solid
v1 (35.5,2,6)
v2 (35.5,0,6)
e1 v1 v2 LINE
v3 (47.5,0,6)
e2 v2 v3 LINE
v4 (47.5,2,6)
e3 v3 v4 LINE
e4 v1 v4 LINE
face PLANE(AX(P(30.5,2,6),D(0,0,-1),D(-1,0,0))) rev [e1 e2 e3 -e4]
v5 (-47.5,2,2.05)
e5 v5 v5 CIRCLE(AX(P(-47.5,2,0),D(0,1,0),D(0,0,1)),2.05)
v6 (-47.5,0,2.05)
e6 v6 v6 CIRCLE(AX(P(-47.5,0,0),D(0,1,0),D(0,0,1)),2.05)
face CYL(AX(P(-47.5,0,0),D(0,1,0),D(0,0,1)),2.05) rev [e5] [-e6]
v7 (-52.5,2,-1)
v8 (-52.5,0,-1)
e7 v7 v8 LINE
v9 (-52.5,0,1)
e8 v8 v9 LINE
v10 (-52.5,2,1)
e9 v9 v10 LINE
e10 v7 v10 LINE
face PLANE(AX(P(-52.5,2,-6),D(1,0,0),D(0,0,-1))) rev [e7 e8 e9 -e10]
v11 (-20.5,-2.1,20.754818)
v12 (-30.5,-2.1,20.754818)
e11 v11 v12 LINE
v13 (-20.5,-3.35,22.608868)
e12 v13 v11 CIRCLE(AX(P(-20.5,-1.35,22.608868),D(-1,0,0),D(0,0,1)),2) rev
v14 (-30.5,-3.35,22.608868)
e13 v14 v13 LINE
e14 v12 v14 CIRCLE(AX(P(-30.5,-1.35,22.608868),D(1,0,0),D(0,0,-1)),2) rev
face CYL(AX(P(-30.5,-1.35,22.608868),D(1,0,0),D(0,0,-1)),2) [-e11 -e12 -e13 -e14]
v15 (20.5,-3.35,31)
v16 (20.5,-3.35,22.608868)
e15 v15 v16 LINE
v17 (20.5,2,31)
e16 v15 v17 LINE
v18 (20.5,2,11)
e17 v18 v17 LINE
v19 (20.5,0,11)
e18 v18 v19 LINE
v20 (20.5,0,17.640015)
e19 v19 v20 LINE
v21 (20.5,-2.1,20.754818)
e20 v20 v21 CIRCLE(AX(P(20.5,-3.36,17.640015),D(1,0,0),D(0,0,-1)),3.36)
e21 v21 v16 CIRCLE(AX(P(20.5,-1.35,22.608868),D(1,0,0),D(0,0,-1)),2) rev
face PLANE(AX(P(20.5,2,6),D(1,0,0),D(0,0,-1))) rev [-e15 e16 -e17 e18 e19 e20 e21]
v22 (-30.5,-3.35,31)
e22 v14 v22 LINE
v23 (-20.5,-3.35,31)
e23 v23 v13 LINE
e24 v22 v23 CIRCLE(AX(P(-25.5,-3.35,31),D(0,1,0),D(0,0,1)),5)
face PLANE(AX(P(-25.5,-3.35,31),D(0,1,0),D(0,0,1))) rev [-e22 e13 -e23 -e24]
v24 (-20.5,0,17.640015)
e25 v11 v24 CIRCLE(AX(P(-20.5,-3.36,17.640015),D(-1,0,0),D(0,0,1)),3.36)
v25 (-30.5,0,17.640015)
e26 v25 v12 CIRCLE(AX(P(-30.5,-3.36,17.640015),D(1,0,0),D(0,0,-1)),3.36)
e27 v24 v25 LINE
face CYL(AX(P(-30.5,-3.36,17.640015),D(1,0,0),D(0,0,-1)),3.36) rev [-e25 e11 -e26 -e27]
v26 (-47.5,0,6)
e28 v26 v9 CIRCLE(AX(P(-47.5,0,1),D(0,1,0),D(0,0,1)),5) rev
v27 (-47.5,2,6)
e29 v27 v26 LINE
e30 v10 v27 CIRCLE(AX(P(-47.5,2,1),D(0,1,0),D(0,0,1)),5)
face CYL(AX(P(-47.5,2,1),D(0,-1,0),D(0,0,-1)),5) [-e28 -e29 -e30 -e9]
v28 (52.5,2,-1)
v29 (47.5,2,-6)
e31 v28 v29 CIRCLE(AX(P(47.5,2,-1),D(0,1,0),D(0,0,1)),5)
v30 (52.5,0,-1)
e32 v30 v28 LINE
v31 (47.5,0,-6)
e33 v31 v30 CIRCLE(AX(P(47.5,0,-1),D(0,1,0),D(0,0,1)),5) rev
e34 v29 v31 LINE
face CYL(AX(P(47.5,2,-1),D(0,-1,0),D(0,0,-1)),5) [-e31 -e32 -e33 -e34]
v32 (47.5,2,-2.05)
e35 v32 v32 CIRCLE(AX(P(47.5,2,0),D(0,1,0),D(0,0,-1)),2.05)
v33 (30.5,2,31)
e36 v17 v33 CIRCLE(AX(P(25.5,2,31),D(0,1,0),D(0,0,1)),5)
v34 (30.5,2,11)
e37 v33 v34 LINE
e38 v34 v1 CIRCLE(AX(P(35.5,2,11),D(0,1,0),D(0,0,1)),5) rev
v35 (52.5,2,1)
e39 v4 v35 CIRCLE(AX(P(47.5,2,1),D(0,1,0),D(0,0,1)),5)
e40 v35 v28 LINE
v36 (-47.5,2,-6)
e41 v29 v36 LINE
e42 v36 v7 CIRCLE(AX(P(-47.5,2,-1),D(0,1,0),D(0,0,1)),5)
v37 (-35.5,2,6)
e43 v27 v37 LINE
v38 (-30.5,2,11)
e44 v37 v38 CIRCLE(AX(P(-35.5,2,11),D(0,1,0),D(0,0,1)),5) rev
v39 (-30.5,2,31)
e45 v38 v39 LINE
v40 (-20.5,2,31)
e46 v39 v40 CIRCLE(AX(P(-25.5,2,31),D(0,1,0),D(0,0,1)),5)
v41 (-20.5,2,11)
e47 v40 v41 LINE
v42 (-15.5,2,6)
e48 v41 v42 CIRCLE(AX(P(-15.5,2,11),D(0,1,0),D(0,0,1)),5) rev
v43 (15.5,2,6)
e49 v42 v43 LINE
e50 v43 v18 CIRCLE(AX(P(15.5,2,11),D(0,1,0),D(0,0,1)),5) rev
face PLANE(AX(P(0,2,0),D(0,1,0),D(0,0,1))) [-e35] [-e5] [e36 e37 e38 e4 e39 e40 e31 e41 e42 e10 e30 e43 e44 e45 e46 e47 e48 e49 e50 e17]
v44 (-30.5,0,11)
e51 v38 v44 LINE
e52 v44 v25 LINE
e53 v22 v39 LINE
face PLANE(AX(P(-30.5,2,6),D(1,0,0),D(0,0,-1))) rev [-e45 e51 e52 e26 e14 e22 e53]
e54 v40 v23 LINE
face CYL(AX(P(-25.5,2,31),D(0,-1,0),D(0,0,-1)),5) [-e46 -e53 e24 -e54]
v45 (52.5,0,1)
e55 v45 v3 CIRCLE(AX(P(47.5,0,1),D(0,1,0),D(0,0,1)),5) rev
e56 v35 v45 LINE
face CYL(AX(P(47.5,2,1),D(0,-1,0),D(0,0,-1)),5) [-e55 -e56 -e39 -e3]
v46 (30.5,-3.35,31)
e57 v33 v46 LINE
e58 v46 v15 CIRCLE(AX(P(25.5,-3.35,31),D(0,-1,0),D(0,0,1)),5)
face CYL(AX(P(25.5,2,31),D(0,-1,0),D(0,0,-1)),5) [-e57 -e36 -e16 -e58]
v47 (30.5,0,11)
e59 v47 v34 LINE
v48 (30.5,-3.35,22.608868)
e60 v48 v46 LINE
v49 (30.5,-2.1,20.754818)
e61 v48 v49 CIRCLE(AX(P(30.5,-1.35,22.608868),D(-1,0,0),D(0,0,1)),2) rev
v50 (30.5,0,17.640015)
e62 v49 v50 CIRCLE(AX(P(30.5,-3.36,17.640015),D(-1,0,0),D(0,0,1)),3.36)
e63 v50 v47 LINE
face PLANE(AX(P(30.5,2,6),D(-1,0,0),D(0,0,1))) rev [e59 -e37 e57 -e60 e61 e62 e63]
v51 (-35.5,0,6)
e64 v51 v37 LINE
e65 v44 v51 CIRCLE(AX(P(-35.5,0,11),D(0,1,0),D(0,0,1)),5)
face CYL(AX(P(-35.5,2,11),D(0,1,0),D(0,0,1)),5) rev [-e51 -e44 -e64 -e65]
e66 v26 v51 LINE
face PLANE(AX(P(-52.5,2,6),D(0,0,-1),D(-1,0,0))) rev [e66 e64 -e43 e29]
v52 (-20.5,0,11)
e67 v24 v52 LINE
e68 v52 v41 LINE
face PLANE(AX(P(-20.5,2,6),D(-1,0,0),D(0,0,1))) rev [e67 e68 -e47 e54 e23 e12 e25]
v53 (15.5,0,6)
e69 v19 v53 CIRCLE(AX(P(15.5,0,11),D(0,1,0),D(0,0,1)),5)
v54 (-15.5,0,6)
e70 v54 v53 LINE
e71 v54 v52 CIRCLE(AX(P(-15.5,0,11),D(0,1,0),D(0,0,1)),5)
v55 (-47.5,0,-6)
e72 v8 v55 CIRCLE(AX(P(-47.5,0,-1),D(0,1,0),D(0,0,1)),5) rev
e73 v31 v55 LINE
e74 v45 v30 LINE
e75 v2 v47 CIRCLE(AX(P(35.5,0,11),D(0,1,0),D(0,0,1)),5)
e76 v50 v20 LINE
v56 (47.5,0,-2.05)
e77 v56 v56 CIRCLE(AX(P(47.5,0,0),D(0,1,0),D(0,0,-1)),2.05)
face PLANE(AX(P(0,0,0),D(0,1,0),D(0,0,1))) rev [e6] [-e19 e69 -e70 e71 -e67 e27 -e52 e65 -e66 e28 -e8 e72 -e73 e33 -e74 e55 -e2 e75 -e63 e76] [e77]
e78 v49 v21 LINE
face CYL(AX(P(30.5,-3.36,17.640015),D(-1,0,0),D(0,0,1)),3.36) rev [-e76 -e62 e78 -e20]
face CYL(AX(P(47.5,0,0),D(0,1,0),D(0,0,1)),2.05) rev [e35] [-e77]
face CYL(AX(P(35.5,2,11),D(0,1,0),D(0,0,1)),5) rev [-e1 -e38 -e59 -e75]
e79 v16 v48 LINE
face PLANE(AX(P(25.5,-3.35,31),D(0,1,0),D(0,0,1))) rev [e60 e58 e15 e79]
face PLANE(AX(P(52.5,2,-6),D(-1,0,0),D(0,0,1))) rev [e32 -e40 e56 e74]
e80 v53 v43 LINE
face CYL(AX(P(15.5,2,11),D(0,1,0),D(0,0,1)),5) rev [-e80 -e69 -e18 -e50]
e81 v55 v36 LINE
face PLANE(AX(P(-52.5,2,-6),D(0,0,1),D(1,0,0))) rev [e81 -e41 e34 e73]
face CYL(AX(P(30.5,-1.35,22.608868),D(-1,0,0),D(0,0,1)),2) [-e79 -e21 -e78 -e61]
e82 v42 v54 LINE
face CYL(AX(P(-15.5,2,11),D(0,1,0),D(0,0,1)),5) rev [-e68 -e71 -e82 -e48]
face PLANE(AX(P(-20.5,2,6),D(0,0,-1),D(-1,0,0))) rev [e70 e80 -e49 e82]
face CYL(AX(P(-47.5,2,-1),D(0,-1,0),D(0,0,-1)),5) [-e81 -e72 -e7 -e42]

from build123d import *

# Parameters (mm, degrees)
BOSS_EXTRUDE1_DEPTH  = 2
SKETCH3_R            = 2.05
CUT_EXTRUDE1_DEPTH   = 64.688696014
FILLET1_R            = 5
BOSS_EXTRUDE2_DEPTH  = 5.35
FILLET2_R            = 3.36
FILLET3_R            = 2
FILLET2_OF_MIRROR1_R = 3.36
FILLET3_OF_MIRROR1_R = 2


# Some blends are built 0.0001 mm under size
with BuildPart() as part:
    # Sketch1 → Boss-Extrude1 (new body)
    with BuildSketch(Plane(origin=(0, 0, 0), x_dir=(1, 0, 0), z_dir=(0, 1, 0))):
        Polygon((-52.5, 6), (52.5, 6), (52.5, -6), (30.5, -6), (30.5, -36), (20.5, -36), (20.5, -6), (-20.5, -6), (-20.5, -36), (-30.5, -36), (-30.5, -6), (-52.5, -6), align=None)
    extrude(amount=BOSS_EXTRUDE1_DEPTH)

    # Sketch3 → Cut-Extrude1 (cut, through all)
    with BuildSketch(Plane(origin=(0, 2, 0), x_dir=(1, 0, 0), z_dir=(0, 1, 0))):
        with Locations(Location((-47.5, 0, 0), (0, 0, 270))):
            Circle(SKETCH3_R)
        with Locations(Location((47.5, 0, 0), (0, 0, 90))):
            Circle(SKETCH3_R)
    extrude(amount=-CUT_EXTRUDE1_DEPTH, mode=Mode.SUBTRACT)

    # Fillet1
    fillet1_edges = [part.edges().sort_by_distance(p)[0] for p in [
        (52.5, 1, -6),
        (52.5, 1, 6),
        (20.5, 1, 6),
        (30.5, 1, 6),
        (30.5, 1, 36),
        (20.5, 1, 36),
        (-30.5, 1, 36),
        (-20.5, 1, 36),
        (-20.5, 1, 6),
        (-30.5, 1, 6),
        (-52.5, 1, -6),
        (-52.5, 1, 6),
    ]]
    fillet(fillet1_edges, radius=FILLET1_R - 0.0001)  # a hair under: the kernel refuses the full size

    # Sketch4 → Boss-Extrude2 (add)
    with BuildSketch(Plane(origin=(0, 2, 0), x_dir=(1, 0, 0), z_dir=(0, 1, 0))):
        with BuildLine():
            Line((-20.5, -31), (-20.5, -21))
            Line((-20.5, -21), (-30.5, -21))
            Line((-30.5, -21), (-30.5, -31))
            ThreePointArc((-30.5, -31), (-29.035533906, -34.535533906), (-25.5, -36))
            ThreePointArc((-25.5, -36), (-21.964466094, -34.535533906), (-20.5, -31))
        make_face()
    boss_extrude2 = extrude(amount=-BOSS_EXTRUDE2_DEPTH)

    # Fillet2
    # the kernel refuses this fillet: 3.36 mm, written as the material it adds along each edge
    with BuildSketch(Plane(origin=(-30.5, 0, 21), x_dir=(0, -1, 0), z_dir=(1, 0, 0))) as fillet2_piece_1_section:
        with BuildLine():
            CenterArc((FILLET2_R, FILLET2_R), FILLET2_R, 180, 90)
            Line((0, FILLET2_R), (0, 0))
            Line((0, 0), (FILLET2_R, 0))
        make_face()
    fillet2_piece_1 = extrude(amount=10, mode=Mode.PRIVATE)
    fillet2_piece_1 = split(fillet2_piece_1, bisect_by=Plane(origin=(-25.5, -3.35, 20.239126953), z_dir=(0, 1, 0)), keep=Keep.TOP, mode=Mode.PRIVATE)
    add(fillet2_piece_1)

    # Fillet3
    fillet3_edges = [part.edges().sort_by_distance(p)[0] for p in [
        (-25.5, -3.35, 20.999985119),
    ]]
    fillet(fillet3_edges, radius=FILLET3_R)

    # Mirror1: Boss-Extrude2 across plane
    add(boss_extrude2.mirror(Plane(origin=(0, 0, 0), x_dir=(0, 0, 1), z_dir=(1, 0, 0))))

    # Fillet2 of Mirror1
    # the kernel refuses this fillet: 3.36 mm, written as the material it adds along each edge
    with BuildSketch(Plane(origin=(30.5, 0, 21), x_dir=(0, -1, 0), z_dir=(-1, 0, 0))) as fillet2_of_mirror1_piece_1_section:
        with BuildLine():
            CenterArc((FILLET2_OF_MIRROR1_R, -FILLET2_OF_MIRROR1_R), FILLET2_OF_MIRROR1_R, 90, 90)
            Line((0, -FILLET2_OF_MIRROR1_R), (0, 0))
            Line((0, 0), (FILLET2_OF_MIRROR1_R, 0))
        make_face()
    fillet2_of_mirror1_piece_1 = extrude(amount=10, mode=Mode.PRIVATE)
    fillet2_of_mirror1_piece_1 = split(fillet2_of_mirror1_piece_1, bisect_by=Plane(origin=(25.5, -3.35, 20.239126953), z_dir=(0, 1, 0)), keep=Keep.TOP, mode=Mode.PRIVATE)
    add(fillet2_of_mirror1_piece_1)

    # Fillet3 of Mirror1
    fillet3_of_mirror1_edges = [part.edges().sort_by_distance(p)[0] for p in [
        (25.5, -3.35, 20.999985119),
    ]]
    fillet(fillet3_of_mirror1_edges, radius=FILLET3_OF_MIRROR1_R)


solid = part.part
